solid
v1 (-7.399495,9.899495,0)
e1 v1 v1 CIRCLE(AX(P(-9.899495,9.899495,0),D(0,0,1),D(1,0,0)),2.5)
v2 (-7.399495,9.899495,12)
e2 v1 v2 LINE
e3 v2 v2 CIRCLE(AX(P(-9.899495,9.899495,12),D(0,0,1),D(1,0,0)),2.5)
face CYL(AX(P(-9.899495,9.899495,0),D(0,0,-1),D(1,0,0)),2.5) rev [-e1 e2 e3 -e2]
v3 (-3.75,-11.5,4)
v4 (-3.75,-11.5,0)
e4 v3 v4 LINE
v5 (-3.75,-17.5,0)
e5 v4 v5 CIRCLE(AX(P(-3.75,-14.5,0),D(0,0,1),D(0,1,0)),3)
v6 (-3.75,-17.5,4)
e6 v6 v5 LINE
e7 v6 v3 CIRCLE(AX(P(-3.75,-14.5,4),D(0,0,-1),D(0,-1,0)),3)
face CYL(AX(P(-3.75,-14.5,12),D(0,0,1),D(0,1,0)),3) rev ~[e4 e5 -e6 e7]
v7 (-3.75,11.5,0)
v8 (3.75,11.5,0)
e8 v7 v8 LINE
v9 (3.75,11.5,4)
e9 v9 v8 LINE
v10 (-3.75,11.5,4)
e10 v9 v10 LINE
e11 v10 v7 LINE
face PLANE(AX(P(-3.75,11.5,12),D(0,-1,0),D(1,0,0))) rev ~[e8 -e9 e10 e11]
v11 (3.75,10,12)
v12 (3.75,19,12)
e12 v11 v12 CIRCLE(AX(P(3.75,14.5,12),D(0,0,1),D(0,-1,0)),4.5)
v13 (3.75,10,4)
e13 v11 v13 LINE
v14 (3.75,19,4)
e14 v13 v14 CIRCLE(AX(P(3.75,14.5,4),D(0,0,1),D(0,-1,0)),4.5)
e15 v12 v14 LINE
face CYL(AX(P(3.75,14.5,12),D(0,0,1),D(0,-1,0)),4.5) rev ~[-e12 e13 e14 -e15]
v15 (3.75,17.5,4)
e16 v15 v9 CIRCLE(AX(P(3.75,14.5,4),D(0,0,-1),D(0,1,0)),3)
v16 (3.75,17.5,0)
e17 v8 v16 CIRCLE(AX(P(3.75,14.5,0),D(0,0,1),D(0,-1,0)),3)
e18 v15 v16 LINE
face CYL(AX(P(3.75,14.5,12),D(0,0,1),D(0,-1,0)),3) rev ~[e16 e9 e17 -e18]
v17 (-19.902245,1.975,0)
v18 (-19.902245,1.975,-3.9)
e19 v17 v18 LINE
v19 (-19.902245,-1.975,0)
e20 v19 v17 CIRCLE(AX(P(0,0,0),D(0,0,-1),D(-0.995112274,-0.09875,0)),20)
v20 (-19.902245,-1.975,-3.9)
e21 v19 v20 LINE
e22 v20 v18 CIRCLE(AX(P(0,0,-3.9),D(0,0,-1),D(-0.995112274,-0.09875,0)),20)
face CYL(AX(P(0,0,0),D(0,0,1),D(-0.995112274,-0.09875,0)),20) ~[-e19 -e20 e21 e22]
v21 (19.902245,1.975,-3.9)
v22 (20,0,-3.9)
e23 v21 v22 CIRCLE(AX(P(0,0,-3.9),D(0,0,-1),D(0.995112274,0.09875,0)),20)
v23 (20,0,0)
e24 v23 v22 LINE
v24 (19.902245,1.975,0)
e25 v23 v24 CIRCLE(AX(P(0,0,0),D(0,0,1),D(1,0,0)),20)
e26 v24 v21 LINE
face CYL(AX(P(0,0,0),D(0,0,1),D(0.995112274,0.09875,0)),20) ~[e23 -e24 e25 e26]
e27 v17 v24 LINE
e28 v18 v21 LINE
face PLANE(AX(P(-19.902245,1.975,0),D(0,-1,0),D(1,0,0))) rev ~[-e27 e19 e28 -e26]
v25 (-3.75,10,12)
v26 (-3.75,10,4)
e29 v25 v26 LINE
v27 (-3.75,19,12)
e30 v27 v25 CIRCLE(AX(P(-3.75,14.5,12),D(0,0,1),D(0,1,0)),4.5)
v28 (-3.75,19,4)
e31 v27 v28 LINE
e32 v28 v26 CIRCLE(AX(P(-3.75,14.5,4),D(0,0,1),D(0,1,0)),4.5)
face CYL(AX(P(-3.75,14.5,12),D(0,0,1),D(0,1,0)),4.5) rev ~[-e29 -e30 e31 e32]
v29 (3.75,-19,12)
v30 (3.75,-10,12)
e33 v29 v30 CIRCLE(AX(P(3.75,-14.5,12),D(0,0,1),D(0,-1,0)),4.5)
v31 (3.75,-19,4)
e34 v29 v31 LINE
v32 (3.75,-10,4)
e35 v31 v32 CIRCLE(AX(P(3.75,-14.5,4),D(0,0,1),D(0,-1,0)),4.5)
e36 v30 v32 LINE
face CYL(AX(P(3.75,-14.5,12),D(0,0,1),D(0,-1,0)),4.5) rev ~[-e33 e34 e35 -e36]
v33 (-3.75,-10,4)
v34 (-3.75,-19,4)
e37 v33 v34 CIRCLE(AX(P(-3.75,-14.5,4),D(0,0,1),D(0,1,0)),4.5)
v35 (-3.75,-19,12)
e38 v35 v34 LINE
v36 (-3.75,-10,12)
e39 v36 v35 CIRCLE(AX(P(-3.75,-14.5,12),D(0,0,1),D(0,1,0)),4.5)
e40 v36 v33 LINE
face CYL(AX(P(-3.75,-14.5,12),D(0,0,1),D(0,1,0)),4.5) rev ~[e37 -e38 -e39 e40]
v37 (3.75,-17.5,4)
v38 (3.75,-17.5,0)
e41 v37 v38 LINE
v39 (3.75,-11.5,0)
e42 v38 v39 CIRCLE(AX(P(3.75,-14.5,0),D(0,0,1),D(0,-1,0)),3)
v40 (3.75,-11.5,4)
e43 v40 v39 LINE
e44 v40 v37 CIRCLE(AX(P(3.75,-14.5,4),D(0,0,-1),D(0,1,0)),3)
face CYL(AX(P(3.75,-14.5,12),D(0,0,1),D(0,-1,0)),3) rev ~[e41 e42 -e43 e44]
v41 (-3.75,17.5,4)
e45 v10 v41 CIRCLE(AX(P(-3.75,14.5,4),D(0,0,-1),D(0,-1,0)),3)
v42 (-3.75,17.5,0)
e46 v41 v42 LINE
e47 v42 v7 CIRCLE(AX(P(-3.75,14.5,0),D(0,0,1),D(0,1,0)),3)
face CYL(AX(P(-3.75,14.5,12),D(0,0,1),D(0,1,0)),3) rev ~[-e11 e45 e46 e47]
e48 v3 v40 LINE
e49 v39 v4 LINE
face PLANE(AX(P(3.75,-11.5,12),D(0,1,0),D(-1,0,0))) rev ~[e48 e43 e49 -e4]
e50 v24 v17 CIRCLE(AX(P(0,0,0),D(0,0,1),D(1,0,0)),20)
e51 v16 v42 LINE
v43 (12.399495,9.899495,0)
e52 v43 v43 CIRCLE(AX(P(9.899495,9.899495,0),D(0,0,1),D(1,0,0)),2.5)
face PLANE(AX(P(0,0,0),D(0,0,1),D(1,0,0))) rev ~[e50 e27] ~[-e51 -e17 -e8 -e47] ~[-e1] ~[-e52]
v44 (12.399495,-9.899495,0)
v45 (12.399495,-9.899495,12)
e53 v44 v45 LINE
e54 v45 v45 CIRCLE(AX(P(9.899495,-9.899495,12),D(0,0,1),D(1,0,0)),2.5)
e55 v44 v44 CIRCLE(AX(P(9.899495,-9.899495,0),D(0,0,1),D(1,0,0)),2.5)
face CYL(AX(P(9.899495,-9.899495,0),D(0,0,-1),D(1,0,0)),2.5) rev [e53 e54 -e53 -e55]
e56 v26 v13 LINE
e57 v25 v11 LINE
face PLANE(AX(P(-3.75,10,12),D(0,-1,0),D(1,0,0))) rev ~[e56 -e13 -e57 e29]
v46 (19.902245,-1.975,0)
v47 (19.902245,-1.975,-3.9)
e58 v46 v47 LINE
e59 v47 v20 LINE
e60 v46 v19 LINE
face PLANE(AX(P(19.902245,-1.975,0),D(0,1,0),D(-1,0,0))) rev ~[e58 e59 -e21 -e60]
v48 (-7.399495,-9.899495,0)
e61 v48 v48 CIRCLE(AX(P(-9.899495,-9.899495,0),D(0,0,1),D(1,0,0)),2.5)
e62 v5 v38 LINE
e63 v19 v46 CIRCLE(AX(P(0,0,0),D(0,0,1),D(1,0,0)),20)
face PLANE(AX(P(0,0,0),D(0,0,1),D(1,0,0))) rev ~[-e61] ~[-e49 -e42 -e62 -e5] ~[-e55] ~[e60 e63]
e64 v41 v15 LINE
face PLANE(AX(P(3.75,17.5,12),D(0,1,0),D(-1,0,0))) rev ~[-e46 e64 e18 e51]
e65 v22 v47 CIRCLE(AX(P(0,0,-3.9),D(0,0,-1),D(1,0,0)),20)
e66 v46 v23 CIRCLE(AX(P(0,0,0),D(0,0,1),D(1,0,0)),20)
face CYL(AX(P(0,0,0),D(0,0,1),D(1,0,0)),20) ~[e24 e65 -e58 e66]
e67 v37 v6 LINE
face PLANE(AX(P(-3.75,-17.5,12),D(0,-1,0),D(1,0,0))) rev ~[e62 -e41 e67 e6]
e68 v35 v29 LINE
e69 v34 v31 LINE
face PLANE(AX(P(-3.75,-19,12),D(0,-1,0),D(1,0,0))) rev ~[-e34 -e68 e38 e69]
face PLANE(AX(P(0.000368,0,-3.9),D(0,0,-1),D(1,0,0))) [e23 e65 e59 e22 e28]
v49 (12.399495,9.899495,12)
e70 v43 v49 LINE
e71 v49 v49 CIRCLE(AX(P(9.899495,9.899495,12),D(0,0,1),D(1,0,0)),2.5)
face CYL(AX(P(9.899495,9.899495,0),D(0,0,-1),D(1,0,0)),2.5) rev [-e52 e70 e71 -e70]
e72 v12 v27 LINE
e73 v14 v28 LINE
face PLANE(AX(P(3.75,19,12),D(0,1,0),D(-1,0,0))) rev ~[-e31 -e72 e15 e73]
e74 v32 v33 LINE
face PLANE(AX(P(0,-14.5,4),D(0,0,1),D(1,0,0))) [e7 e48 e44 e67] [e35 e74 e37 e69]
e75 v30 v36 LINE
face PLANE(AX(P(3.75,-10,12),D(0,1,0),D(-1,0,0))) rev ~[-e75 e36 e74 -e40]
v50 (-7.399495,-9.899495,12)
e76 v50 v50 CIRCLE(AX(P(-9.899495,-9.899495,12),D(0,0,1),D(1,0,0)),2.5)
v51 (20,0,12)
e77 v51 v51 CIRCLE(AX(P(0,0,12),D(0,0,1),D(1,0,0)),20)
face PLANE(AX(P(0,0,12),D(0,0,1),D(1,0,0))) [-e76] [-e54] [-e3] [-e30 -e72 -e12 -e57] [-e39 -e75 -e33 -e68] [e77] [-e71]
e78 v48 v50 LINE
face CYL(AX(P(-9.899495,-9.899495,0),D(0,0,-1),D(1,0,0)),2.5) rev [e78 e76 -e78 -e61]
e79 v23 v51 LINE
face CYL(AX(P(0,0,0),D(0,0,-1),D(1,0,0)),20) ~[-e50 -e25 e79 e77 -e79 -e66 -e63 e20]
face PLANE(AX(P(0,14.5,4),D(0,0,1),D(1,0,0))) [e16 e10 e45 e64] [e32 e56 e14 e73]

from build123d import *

# Parameters (mm, degrees)
F0_R     = 20
F0_R_2   = 2.5
F1_DEPTH = 12
F3_DEPTH = 3.9
F5_DEPTH = 15.901
F7_DEPTH = 8


# Not quite as in the source:
# - after a boolean that leaves OpenCascade's solid faulty, fix() repairs it


with BuildPart() as f1:
    # F0 (on Top) → F1 (new body)
    with BuildSketch(Plane.XY):
        Circle(F0_R)
        with Locations((-9.8994949366, -9.8994949366)):
            Circle(F0_R_2, mode=Mode.SUBTRACT)
        with Locations((9.8994949366, -9.8994949366)):
            Circle(F0_R_2, mode=Mode.SUBTRACT)
        with Locations((-9.8994949366, 9.8994949366)):
            Circle(F0_R_2, mode=Mode.SUBTRACT)
        with Locations((9.8994949366, 9.8994949366)):
            Circle(F0_R_2, mode=Mode.SUBTRACT)
    extrude(amount=F1_DEPTH)

    # F2 (on face) → F3 (join)
    with BuildSketch(Plane(origin=(0, 0, 0), x_dir=(1, 0, 0), z_dir=(0, 0, -1))):
        with BuildLine():
            Line((19.9022454763, 1.975), (-19.9022454763, 1.975))
            ThreePointArc((-19.9022454763, 1.975), (-20, 0), (-19.9022454763, -1.975))
            Line((-19.9022454763, -1.975), (19.9022454763, -1.975))
            ThreePointArc((19.9022454763, -1.975), (19.9755464196, -0.9887088736), (20, 0))
            ThreePointArc((20, 0), (19.9755464196, 0.9887088736), (19.9022454763, 1.975))
        make_face()
    extrude(amount=F3_DEPTH)

    add(f1.part.fix(), mode=Mode.REPLACE)

    # F4 (on face) → F5 (cut, through all)
    with BuildSketch(Plane.XY.offset(12)):
        with BuildLine():
            Line((3.75, 17.5), (-3.75, 17.5))
            ThreePointArc((-3.75, 17.5), (-6.75, 14.5), (-3.75, 11.5))
            Line((-3.75, 11.5), (3.75, 11.5))
            ThreePointArc((3.75, 11.5), (6.75, 14.5), (3.75, 17.5))
        make_face()
        with BuildLine():
            ThreePointArc((3.75, -17.5), (6.75, -14.5), (3.75, -11.5))
            Line((3.75, -11.5), (-3.75, -11.5))
            ThreePointArc((-3.75, -11.5), (-6.75, -14.5), (-3.75, -17.5))
            Line((-3.75, -17.5), (3.75, -17.5))
        make_face()
    extrude(amount=-F5_DEPTH, mode=Mode.SUBTRACT)

    # F6 (on face) → F7 (cut)
    with BuildSketch(Plane.XY.offset(12)):
        with BuildLine():
            Line((3.75, 19), (-3.75, 19))
            ThreePointArc((-3.75, 19), (-8.25, 14.5), (-3.75, 10))
            Line((-3.75, 10), (3.75, 10))
            ThreePointArc((3.75, 10), (8.25, 14.5), (3.75, 19))
        make_face()
        with BuildLine():
            ThreePointArc((-3.75, 11.5), (-6.75, 14.5), (-3.75, 17.5))
            Line((-3.75, 17.5), (3.75, 17.5))
            ThreePointArc((3.75, 17.5), (6.75, 14.5), (3.75, 11.5))
            Line((3.75, 11.5), (-3.75, 11.5))
        make_face(mode=Mode.SUBTRACT)
        with BuildLine():
            ThreePointArc((3.75, -19), (8.25, -14.5), (3.75, -10))
            Line((3.75, -10), (-3.75, -10))
            ThreePointArc((-3.75, -10), (-8.25, -14.5), (-3.75, -19))
            Line((-3.75, -19), (3.75, -19))
        make_face()
        with BuildLine():
            ThreePointArc((3.75, -11.5), (6.75, -14.5), (3.75, -17.5))
            Line((3.75, -17.5), (-3.75, -17.5))
            ThreePointArc((-3.75, -17.5), (-6.75, -14.5), (-3.75, -11.5))
            Line((-3.75, -11.5), (3.75, -11.5))
        make_face(mode=Mode.SUBTRACT)
    extrude(amount=-F7_DEPTH, mode=Mode.SUBTRACT)


solid = f1.part
